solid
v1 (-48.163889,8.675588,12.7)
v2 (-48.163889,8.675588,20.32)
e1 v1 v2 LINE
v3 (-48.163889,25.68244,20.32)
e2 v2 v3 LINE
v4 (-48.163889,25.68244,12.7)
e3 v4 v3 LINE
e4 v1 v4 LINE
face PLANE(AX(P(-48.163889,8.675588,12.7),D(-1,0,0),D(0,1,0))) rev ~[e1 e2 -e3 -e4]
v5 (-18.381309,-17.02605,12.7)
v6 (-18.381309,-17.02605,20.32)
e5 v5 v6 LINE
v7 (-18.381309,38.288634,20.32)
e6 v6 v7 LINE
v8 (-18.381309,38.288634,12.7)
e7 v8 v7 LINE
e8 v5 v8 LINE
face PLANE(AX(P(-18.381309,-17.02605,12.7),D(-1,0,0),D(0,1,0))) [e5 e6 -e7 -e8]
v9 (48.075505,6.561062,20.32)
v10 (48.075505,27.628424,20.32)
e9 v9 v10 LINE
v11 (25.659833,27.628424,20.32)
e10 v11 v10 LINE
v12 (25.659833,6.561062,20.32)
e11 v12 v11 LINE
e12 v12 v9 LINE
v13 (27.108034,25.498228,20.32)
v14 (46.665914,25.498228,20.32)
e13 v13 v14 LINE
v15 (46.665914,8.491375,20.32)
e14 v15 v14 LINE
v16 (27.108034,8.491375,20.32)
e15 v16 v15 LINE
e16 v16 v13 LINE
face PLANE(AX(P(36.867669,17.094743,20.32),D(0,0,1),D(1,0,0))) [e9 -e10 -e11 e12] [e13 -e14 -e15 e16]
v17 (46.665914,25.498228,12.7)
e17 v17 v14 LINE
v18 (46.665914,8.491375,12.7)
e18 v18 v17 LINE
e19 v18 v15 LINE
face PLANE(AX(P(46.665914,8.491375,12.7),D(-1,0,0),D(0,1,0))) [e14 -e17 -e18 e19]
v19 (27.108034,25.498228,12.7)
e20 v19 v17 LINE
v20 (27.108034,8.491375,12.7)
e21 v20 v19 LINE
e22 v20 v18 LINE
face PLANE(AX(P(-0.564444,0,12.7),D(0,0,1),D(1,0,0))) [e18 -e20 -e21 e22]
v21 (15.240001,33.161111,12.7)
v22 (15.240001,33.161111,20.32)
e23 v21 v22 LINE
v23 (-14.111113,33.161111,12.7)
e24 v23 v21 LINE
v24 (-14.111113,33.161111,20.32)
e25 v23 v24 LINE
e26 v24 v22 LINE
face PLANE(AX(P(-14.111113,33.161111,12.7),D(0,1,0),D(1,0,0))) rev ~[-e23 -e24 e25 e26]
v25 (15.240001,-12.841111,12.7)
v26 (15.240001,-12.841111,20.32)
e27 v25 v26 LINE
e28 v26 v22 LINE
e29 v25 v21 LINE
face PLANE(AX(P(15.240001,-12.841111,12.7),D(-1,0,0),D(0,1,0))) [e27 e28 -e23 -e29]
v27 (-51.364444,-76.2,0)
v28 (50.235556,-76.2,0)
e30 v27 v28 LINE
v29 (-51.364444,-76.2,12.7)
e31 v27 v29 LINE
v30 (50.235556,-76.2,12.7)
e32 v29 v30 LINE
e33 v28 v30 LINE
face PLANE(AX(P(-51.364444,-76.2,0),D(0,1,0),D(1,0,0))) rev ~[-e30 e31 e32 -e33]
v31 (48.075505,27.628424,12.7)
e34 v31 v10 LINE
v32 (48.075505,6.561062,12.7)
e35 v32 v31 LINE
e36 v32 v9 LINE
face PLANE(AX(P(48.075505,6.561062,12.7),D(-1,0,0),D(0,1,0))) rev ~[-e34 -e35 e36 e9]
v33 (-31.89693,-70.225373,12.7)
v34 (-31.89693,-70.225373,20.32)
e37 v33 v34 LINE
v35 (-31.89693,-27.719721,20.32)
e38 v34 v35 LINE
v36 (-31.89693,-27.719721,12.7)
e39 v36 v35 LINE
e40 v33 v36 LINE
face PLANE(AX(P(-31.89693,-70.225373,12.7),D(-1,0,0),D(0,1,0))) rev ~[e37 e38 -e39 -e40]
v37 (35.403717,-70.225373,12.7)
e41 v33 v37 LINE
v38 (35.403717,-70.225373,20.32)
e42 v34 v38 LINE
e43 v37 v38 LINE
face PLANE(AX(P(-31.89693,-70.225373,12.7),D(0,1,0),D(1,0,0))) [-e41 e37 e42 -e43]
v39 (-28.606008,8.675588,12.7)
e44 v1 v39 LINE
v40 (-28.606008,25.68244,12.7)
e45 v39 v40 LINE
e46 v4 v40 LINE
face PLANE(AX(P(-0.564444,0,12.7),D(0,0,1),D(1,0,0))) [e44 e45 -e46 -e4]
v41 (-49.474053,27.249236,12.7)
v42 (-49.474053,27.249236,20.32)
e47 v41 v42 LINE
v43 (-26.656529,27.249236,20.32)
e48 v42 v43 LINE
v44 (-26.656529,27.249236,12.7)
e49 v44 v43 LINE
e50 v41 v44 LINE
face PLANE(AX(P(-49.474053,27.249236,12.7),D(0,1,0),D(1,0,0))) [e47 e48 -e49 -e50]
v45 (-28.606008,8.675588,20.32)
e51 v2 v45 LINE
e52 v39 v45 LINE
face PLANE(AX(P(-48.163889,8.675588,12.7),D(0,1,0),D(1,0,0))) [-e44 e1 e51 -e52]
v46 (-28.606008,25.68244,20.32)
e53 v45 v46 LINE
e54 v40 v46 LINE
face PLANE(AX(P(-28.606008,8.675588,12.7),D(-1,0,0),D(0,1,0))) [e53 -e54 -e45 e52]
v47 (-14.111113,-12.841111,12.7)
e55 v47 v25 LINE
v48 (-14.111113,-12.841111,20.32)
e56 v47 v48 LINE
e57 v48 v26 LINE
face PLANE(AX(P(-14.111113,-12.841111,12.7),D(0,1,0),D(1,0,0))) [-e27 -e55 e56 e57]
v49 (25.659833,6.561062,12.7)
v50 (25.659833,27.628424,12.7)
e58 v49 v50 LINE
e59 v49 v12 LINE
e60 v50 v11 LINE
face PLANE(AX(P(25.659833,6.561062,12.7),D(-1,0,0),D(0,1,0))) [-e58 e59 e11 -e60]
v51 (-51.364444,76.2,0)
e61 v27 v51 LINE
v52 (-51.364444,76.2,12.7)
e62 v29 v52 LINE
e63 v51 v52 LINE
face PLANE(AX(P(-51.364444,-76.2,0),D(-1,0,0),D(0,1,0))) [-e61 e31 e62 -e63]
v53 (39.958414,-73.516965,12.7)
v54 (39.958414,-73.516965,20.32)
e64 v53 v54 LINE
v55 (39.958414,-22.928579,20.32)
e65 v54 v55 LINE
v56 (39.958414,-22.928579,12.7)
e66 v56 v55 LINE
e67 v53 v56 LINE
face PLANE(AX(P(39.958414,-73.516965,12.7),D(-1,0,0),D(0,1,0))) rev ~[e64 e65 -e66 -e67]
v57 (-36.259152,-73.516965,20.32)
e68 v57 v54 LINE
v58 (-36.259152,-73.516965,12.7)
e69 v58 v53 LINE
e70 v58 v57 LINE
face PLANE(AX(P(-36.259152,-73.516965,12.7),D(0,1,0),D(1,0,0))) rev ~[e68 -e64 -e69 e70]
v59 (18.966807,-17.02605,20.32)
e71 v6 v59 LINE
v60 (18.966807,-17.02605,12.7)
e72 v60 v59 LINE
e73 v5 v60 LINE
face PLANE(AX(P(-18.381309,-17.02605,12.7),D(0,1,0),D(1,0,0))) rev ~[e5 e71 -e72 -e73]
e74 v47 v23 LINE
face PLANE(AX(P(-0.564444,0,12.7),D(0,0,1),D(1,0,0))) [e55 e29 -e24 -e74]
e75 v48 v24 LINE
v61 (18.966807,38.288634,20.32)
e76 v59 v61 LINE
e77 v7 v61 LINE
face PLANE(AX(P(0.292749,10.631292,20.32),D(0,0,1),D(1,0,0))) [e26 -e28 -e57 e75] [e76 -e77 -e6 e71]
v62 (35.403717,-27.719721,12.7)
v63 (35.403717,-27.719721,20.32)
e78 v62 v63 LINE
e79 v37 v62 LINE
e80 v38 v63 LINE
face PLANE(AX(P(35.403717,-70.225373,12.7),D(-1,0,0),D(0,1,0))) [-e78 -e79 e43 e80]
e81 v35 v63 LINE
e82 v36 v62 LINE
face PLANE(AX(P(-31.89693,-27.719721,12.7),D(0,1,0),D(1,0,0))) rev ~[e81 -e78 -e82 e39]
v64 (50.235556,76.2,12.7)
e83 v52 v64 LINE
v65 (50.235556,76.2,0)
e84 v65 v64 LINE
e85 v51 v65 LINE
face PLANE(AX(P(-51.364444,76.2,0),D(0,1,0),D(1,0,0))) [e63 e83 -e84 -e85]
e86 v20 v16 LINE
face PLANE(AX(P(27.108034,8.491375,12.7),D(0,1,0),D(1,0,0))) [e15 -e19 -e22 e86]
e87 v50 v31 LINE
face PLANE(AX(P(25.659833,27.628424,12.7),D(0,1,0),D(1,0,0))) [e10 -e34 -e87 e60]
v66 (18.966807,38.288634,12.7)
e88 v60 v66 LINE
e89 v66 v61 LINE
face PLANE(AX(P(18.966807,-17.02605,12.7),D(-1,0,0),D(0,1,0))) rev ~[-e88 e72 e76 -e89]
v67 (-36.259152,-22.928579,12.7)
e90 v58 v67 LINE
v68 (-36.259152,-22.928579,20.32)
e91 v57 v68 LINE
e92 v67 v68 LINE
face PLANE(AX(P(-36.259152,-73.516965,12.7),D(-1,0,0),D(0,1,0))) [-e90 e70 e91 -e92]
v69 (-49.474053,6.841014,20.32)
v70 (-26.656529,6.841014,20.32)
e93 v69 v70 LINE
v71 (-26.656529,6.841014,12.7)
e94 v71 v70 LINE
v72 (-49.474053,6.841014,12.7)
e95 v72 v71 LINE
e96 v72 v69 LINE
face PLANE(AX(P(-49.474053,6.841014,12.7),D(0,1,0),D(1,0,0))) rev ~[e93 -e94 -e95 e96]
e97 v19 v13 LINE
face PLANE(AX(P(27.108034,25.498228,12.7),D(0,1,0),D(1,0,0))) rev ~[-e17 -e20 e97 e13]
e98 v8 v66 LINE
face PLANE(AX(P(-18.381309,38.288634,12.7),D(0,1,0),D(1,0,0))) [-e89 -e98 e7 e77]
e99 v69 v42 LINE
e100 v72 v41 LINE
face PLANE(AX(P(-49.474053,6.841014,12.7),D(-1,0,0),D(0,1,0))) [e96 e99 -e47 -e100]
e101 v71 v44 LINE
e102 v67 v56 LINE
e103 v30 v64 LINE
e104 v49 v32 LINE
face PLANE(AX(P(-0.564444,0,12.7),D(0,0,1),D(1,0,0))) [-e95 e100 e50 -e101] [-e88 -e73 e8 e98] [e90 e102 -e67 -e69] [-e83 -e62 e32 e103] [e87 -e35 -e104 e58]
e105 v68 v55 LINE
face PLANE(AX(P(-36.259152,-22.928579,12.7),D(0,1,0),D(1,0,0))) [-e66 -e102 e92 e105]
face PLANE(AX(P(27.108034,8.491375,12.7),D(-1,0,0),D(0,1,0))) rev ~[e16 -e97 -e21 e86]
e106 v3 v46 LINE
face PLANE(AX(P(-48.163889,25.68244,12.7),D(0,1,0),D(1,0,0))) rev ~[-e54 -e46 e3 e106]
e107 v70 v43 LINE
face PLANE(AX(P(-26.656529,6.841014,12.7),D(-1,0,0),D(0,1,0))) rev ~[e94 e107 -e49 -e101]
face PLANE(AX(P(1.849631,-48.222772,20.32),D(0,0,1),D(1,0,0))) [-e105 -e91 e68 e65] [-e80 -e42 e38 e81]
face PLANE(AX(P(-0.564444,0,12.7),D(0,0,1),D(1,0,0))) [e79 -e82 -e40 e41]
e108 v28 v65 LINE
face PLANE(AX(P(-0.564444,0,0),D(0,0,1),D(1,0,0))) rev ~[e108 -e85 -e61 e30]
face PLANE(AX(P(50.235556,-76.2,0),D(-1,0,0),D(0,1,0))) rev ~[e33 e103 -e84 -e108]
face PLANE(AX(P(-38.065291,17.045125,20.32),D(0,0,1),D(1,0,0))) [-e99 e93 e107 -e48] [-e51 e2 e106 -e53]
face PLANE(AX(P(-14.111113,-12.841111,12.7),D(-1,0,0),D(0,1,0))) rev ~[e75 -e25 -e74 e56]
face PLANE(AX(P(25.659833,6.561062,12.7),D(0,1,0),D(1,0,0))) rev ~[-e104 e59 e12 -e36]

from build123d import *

# Parameters (mm, degrees)
F0_W     = 101.6
F0_H     = 152.4
F0_W_2   = 25.9637702256
F0_H_2   = 38.2640473545
F1_DEPTH = 12.7
F2_W     = 37.3481158167
F2_H     = 55.3146842867
F2_W_2   = 29.3511133641
F2_H_2   = 46.0022222251
F2_W_3   = 76.2175656855
F2_H_3   = 50.5883861333
F2_W_4   = 67.3006474972
F2_H_4   = 42.5056517124
F2_W_5   = 22.4156714976
F2_H_5   = 21.067361813
F2_W_6   = 19.5578802377
F2_H_6   = 17.0068526641
F2_W_7   = 22.81752415
F2_H_7   = 20.4082219861
F3_DEPTH = 7.62


with BuildPart() as f1:
    # F0 (on Top) → F1 (new body)
    with BuildSketch(Plane.XY):
        with Locations((-0.5644435562, 0)):
            Rectangle(F0_W, F0_H)
        with Locations((0.3079539165, 19.1320236772)):
            Rectangle(F0_W_2, F0_H_2, mode=Mode.SUBTRACT)
        with Locations((0.3079539165, 19.1320236772)):
            Rectangle(F0_W_2, F0_H_2)
    extrude(amount=F1_DEPTH)

    # F2 (on face) → F3 (join)
    with BuildSketch(Plane.XY.offset(12.7)):
        with Locations((0.2927491441, 10.6312921271)):
            Rectangle(F2_W, F2_H)
        with Locations((0.5644438788, 10.1600000635)):
            Rectangle(F2_W_2, F2_H_2, mode=Mode.SUBTRACT)
        with Locations((1.8496308476, -48.2227718458)):
            Rectangle(F2_W_3, F2_H_3)
        with Locations((1.7533935606, -48.9725470543)):
            Rectangle(F2_W_4, F2_H_4, mode=Mode.SUBTRACT)
        with Locations((36.8676688522, 17.0947427396)):
            Rectangle(F2_W_5, F2_H_5)
        with Locations((36.8869742379, 16.9948018156)):
            Rectangle(F2_W_6, F2_H_6, mode=Mode.SUBTRACT)
        with Locations((-38.0652910098, 17.0451246668)):
            Rectangle(F2_W_7, F2_H_7)
        with Locations((-38.3849483915, 17.1790141612)):
            Rectangle(F2_W_6, F2_H_6, mode=Mode.SUBTRACT)
    extrude(amount=F3_DEPTH)


solid = f1.part
